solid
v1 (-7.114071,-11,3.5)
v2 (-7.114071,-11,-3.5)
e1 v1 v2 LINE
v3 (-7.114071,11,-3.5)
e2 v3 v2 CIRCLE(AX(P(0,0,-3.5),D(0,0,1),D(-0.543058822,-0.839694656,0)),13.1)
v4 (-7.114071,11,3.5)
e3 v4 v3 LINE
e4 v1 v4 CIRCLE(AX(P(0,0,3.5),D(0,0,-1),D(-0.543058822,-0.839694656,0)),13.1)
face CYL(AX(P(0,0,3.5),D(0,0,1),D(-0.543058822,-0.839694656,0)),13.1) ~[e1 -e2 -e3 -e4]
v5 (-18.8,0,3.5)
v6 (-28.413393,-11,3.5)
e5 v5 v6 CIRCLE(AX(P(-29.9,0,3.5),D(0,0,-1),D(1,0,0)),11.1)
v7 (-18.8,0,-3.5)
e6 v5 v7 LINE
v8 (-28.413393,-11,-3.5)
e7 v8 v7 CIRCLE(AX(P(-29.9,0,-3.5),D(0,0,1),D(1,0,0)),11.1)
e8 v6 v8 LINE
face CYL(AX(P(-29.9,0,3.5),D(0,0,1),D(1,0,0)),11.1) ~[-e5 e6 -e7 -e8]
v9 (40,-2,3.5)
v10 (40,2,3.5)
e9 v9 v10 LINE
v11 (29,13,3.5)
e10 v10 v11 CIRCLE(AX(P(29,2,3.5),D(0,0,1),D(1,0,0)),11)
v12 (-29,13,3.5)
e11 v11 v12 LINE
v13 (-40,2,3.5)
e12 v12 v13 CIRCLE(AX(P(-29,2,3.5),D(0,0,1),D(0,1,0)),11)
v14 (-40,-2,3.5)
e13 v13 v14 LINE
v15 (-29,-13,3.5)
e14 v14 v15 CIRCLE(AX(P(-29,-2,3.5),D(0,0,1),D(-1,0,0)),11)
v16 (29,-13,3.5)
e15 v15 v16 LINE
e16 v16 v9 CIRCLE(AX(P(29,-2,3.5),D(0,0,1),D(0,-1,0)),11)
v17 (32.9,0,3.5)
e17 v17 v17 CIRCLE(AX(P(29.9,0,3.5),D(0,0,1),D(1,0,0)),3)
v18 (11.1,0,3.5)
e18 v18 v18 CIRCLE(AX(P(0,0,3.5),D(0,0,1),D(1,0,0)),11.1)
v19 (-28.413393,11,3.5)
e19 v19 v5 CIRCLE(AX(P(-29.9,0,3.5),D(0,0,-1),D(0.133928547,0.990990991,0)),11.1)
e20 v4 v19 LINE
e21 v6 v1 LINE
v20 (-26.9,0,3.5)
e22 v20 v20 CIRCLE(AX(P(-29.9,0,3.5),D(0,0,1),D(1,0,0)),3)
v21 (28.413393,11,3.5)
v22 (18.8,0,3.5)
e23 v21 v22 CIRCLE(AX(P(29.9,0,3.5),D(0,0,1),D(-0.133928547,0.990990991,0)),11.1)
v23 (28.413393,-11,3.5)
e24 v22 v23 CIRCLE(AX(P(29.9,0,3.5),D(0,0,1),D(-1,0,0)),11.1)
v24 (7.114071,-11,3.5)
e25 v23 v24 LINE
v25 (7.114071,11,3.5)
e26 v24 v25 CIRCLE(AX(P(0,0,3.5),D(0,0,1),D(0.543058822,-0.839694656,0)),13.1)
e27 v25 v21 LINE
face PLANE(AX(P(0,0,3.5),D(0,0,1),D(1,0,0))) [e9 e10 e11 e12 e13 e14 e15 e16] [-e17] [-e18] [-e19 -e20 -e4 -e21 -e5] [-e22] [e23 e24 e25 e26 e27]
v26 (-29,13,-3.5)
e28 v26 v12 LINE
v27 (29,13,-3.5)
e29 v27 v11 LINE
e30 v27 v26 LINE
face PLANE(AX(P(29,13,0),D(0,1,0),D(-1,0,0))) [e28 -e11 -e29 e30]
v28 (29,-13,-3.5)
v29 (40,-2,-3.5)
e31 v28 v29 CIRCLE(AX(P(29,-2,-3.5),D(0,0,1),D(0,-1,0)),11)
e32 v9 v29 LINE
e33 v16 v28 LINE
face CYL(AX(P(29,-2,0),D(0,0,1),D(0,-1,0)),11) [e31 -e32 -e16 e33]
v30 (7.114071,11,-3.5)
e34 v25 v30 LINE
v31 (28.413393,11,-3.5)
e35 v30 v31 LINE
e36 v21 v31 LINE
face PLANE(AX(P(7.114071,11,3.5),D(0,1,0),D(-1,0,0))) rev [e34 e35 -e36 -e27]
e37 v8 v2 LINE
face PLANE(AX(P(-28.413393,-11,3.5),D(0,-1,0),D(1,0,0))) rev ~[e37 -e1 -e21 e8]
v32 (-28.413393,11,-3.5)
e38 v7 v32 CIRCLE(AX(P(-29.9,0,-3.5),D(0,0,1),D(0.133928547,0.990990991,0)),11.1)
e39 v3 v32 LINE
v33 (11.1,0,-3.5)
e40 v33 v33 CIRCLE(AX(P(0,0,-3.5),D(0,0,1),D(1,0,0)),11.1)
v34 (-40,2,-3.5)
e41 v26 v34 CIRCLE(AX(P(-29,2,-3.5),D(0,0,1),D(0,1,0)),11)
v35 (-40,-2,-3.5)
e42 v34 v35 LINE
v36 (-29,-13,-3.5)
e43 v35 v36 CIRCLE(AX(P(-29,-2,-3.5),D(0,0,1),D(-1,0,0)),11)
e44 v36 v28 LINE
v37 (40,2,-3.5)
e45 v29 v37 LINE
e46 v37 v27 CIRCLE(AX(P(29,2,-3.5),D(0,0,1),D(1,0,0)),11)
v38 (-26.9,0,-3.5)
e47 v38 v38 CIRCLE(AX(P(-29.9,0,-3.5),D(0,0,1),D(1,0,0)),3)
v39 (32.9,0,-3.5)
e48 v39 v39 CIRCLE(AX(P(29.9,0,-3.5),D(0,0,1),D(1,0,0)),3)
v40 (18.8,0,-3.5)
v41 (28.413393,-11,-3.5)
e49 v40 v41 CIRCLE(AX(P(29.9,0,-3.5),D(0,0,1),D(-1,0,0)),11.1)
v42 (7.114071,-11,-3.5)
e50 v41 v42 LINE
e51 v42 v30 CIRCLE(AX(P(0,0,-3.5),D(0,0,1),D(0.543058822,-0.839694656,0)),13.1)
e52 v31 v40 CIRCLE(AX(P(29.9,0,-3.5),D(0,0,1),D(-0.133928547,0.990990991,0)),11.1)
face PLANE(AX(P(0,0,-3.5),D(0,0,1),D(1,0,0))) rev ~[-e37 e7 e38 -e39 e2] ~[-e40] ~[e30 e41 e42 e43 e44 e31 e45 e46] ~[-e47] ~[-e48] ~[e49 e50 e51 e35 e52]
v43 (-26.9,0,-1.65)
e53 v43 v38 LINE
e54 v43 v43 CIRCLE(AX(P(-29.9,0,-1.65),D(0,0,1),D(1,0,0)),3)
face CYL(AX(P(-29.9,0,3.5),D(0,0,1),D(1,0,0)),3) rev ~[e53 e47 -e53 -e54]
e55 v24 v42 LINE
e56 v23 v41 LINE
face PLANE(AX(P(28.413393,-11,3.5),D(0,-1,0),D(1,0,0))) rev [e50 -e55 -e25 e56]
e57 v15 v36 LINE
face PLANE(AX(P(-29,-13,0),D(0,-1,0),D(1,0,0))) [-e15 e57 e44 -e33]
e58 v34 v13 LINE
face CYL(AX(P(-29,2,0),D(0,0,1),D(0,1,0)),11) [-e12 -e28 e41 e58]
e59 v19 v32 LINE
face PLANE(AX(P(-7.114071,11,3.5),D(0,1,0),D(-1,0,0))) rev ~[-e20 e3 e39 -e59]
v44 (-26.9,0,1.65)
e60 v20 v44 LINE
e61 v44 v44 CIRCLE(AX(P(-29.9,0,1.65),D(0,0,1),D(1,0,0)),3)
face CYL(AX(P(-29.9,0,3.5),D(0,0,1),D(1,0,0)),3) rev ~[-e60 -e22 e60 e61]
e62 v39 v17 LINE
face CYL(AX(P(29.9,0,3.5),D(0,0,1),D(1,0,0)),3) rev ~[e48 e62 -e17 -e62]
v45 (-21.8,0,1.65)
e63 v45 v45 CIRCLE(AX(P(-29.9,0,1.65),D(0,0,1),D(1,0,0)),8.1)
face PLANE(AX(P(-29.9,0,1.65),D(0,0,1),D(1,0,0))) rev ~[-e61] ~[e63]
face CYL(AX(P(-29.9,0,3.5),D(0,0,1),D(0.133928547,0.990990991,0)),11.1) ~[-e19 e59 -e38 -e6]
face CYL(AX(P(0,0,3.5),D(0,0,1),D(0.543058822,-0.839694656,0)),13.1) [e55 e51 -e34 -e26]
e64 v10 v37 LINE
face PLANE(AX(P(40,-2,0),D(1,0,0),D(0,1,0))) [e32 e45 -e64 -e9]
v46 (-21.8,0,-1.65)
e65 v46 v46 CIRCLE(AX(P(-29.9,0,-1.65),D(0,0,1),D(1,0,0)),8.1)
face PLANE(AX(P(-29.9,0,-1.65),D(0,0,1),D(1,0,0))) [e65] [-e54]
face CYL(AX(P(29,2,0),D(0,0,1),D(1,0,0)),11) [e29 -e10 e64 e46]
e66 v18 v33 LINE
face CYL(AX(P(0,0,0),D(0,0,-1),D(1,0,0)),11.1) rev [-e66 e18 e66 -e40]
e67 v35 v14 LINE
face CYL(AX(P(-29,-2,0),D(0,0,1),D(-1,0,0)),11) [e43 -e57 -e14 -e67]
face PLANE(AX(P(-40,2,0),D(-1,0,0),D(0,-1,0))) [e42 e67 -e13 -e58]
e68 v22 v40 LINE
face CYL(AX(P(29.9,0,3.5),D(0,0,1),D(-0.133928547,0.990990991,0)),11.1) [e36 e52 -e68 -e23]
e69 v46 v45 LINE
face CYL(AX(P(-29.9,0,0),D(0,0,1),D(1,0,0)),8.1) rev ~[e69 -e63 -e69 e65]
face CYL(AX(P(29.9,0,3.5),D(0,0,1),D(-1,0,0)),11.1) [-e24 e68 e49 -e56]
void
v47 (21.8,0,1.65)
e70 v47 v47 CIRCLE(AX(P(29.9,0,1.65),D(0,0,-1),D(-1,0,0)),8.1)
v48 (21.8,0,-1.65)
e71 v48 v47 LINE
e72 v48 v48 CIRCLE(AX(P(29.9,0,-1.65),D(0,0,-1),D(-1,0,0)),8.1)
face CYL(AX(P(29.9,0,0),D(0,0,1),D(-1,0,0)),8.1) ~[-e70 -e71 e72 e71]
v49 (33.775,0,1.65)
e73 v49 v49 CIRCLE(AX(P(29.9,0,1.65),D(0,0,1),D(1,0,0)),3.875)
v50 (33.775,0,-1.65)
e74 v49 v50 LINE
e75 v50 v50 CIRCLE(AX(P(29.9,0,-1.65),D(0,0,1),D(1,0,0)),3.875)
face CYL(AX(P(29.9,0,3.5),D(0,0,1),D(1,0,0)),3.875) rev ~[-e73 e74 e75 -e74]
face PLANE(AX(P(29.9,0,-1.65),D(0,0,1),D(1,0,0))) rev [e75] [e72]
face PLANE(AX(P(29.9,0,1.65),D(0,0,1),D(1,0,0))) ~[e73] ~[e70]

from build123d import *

# Parameters (mm, degrees)
F0_R      = 11.1
F1_DEPTH  = 3.5
F2_R      = 8.1
F4_DEPTH  = 1.65
F6_DEPTH  = 7.001
F7_R      = 3
F8_DEPTH  = 7.001
F9_R      = 3.875
F9_R_2    = 3
F10_DEPTH = 7


# Not quite as in the source:
# - a pattern or mirror of a feature is missing from the dataset's text; its kind, count and spacing are read off the source's solid


with BuildPart() as f1:
    # F0 (on Top) → F1 (new body, symmetric)
    with BuildSketch(Plane.XY):
        with BuildLine():
            ThreePointArc((40, 2), (36.7781745931, 9.7781745931), (29, 13))
            Line((29, 13), (-29, 13))
            ThreePointArc((-29, 13), (-36.7781745931, 9.7781745931), (-40, 2))
            Line((-40, 2), (-40, -2))
            ThreePointArc((-40, -2), (-36.7781745931, -9.7781745931), (-29, -13))
            Line((-29, -13), (29, -13))
            ThreePointArc((29, -13), (36.7781745931, -9.7781745931), (40, -2))
            Line((40, -2), (40, 2))
        make_face()
        Circle(F0_R, mode=Mode.SUBTRACT)
    extrude(amount=F1_DEPTH, both=True)

    # F2 (on Top) → F4 (cut, symmetric)
    with BuildSketch(Plane.XY):
        with Locations((-29.9, 0)):
            Circle(F2_R)
    f4 = extrude(amount=F4_DEPTH, both=True, mode=Mode.SUBTRACT)

    # F4_copies: F4 across plane
    add(f4.mirror(Plane(origin=(0, 0, 0), x_dir=(0, 0, 1), z_dir=(1, 0, 0))), mode=Mode.SUBTRACT)

    # F5 (on face) → F6 (cut, through all)
    with BuildSketch(Plane.XY.offset(3.5)):
        with BuildLine():
            ThreePointArc((-7.1140705647, -11), (-13.1, 0), (-7.1140705647, 11))
            Line((-7.1140705647, 11), (-28.4133931253, 11))
            ThreePointArc((-28.4133931253, 11), (-21.542029663, 7.3044049618), (-18.8, 0))
            ThreePointArc((-18.8, 0), (-21.542029663, -7.3044049618), (-28.4133931253, -11))
            Line((-28.4133931253, -11), (-7.1140705647, -11))
        make_face()
    f6 = extrude(amount=-F6_DEPTH, mode=Mode.SUBTRACT)

    # F6_copies: F6 across plane
    add(f6.mirror(Plane(origin=(0, 0, 0), x_dir=(0, 0, 1), z_dir=(1, 0, 0))), mode=Mode.SUBTRACT)

    # F7 (on face) → F8 (cut, through all)
    with BuildSketch(Plane.XY.offset(3.5)):
        with Locations((29.9, 0)):
            Circle(F7_R)
        with Locations((-29.9, 0)):
            Circle(F7_R)
    extrude(amount=-F8_DEPTH, mode=Mode.SUBTRACT)

    # F9 (on face) → F10 (join, through all)
    with BuildSketch(Plane.XY.offset(3.5)):
        with Locations((29.9, 0)):
            Circle(F9_R)
        with Locations((29.9, 0)):
            Circle(F9_R_2, mode=Mode.SUBTRACT)
    extrude(amount=-F10_DEPTH)


solid = f1.part
